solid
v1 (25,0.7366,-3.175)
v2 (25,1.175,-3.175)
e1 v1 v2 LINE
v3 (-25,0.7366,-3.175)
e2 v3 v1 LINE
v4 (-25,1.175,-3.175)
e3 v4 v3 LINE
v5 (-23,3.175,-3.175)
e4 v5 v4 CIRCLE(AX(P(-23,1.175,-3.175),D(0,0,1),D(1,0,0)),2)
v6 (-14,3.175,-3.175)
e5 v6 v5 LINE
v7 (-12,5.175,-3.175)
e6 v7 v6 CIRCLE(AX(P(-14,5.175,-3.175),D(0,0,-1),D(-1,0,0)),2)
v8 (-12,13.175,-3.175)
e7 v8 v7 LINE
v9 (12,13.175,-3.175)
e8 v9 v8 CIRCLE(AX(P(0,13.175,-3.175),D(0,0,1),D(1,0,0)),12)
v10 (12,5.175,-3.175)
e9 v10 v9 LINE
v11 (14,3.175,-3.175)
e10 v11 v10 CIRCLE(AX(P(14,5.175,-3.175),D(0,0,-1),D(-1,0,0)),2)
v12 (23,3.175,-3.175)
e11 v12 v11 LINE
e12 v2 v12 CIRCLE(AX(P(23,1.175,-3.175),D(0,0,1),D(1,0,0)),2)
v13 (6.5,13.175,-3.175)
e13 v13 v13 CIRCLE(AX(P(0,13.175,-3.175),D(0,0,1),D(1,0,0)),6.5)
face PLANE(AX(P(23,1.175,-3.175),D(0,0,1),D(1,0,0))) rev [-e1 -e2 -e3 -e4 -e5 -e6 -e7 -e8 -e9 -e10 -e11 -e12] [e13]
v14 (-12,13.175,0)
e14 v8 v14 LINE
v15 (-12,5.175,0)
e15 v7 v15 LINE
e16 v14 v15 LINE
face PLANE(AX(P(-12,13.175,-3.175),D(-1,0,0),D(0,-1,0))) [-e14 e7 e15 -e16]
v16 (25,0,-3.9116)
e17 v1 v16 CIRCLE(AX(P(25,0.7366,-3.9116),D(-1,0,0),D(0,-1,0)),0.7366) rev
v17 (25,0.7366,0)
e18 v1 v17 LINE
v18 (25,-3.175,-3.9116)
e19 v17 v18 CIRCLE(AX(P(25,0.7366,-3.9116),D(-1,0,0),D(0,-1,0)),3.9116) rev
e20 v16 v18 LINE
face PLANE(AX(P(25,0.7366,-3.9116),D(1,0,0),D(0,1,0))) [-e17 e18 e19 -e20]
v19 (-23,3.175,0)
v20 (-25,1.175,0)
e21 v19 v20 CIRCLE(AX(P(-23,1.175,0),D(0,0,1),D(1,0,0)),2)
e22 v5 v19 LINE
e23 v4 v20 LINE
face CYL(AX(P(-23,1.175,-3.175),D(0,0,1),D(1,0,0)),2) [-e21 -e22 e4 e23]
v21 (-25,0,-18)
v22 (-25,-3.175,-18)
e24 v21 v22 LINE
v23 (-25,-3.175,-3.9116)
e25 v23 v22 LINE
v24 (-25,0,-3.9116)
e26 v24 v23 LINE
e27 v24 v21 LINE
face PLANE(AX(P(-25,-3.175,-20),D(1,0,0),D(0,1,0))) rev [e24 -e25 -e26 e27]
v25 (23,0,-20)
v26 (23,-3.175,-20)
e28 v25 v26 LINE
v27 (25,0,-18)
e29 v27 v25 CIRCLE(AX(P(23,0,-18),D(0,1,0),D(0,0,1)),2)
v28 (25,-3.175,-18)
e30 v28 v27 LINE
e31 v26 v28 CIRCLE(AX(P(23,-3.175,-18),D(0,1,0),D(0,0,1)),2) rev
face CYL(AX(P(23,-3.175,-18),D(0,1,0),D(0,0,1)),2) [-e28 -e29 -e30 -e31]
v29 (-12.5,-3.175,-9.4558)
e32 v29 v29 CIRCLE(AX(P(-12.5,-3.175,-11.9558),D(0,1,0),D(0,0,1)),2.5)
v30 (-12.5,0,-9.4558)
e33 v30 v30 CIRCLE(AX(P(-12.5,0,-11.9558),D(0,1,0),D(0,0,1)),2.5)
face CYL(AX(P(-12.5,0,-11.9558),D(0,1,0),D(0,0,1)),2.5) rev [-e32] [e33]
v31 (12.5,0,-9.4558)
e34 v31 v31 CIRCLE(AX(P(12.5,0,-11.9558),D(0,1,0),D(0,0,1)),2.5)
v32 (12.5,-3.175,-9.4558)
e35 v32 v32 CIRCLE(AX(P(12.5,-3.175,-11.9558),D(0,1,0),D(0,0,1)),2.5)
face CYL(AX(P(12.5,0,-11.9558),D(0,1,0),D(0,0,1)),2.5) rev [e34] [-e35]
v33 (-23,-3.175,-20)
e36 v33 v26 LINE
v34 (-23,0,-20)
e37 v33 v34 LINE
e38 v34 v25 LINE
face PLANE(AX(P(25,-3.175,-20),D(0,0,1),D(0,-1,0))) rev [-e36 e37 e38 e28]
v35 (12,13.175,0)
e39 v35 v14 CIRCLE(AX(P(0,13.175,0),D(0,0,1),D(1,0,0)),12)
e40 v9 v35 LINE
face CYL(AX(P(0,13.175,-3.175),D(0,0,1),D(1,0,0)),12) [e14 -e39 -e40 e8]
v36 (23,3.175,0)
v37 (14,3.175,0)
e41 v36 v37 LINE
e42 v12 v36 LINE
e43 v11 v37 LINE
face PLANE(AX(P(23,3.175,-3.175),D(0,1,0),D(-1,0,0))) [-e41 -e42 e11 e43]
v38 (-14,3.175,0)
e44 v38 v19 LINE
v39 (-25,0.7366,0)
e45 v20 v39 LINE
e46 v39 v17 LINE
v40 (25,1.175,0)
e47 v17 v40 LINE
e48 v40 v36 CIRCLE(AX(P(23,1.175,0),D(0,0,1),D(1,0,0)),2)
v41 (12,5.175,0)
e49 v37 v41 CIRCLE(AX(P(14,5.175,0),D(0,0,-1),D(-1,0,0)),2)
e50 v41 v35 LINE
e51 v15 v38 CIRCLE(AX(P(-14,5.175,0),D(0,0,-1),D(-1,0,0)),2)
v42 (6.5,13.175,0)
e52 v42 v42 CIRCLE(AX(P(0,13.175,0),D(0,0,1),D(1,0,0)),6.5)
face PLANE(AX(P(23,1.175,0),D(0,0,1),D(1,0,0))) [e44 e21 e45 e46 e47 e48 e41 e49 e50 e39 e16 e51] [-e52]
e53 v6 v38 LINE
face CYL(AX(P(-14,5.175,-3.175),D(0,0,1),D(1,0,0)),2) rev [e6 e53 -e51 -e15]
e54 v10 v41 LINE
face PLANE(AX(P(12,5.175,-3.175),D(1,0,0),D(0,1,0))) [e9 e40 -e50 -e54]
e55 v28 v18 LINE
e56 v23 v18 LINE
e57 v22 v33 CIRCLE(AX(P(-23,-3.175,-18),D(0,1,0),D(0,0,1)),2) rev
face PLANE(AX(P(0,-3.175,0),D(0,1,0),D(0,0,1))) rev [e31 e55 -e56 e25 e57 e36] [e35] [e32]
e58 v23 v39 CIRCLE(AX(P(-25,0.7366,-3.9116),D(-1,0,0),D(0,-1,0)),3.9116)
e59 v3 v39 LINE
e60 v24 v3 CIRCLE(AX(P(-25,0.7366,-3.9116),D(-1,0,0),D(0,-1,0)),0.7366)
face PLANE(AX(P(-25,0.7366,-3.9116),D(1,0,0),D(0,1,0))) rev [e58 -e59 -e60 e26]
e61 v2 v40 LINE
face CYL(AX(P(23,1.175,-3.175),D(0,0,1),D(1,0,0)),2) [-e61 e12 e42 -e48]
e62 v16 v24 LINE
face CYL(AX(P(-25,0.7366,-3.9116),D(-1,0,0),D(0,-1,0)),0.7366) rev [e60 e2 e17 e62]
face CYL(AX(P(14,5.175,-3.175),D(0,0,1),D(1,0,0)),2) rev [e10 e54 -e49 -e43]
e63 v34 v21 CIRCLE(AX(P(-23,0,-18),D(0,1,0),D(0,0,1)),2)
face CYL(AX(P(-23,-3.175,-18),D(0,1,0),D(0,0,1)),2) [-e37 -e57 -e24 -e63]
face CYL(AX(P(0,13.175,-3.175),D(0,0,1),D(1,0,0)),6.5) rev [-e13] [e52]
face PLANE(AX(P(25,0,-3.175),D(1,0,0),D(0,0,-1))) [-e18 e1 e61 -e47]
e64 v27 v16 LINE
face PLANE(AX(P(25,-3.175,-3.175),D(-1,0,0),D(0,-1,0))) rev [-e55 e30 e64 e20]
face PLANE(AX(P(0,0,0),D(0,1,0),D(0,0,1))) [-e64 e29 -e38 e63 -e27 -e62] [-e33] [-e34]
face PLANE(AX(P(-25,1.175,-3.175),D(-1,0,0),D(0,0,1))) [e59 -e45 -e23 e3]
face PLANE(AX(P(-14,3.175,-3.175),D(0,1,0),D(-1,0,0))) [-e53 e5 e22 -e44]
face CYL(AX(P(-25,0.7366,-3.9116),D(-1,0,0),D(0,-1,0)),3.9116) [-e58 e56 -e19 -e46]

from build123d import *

# Parameters (mm, degrees)
SKETCH1_R                    = 6.5
BASE_FLANGE1_DEPTH           = 3.175
EDGE_FLANGE1_STRIP_W         = 14.1732
EDGE_FLANGE1_STRIP_H         = 3.175
EDGE_FLANGE1_STRIP_CUT_DEPTH = 50
EDGE_FLANGE1_DEPTH           = 50
FILLET2_R                    = 2
F_5_0MM_DOWEL_HOLE1_D        = 5


# Sheet-metal steps are written as plain solids
with BuildPart() as part:
    # Sketch1 → Base-Flange1 (new body)
    with BuildSketch(Plane.XY):
        with BuildLine():
            Line((-25, 0), (25, 0))
            Line((25, 0), (25, 1.175))
            ThreePointArc((25, 1.175), (24.414213562, 2.589213562), (23, 3.175))
            Line((23, 3.175), (14, 3.175))
            ThreePointArc((14, 3.175), (12.585786438, 3.760786438), (12, 5.175))
            Line((12, 5.175), (12, 13.175))
            ThreePointArc((12, 13.175), (0, 25.175), (-12, 13.175))
            Line((-12, 13.175), (-12, 5.175))
            ThreePointArc((-12, 5.175), (-12.585786438, 3.760786438), (-14, 3.175))
            Line((-14, 3.175), (-23, 3.175))
            ThreePointArc((-23, 3.175), (-24.414213562, 2.589213562), (-25, 1.175))
            Line((-25, 1.175), (-25, 0))
        make_face()
        with Locations((0, 13.175)):
            Circle(SKETCH1_R, mode=Mode.SUBTRACT)
    extrude(amount=-BASE_FLANGE1_DEPTH)

    # Edge-Flange1 strip (across the edge) → Edge-Flange1 strip cut (cut)
    with BuildSketch(Plane(origin=(25, 0, -3.175), x_dir=(0, 1, 0), z_dir=(-1, 0, 0))):
        with Locations((-6.35, -1.5875)):
            Rectangle(EDGE_FLANGE1_STRIP_W, EDGE_FLANGE1_STRIP_H)
    extrude(amount=EDGE_FLANGE1_STRIP_CUT_DEPTH, mode=Mode.SUBTRACT)

    # Edge-Flange1 section (across the edge) → Edge-Flange1 (add)
    with BuildSketch(Plane(origin=(25, 0, -3.175), x_dir=(0, 1, 0), z_dir=(-1, 0, 0))):
        with BuildLine():
            Line((-3.175, 0.7366), (-3.175, 16.825))
            Line((-3.175, 16.825), (0, 16.825))
            Line((0, 16.825), (0, 0.7366))
            ThreePointArc((0, 0.7366), (0.215745145, 0.215745145), (0.7366, 0))
            Line((0.7366, 0), (0.7366, -3.175))
            ThreePointArc((0.7366, -3.175), (-2.029318885, -2.029318885), (-3.175, 0.7366))
        make_face()
    extrude(amount=EDGE_FLANGE1_DEPTH)

    # Fillet2
    fillet2_edges = [part.edges().sort_by_distance(p)[0] for p in [
        (25, -1.5875, -20),
        (-25, -1.5875, -20),
    ]]
    fillet(fillet2_edges, radius=FILLET2_R)

    # Ø5.0mm Dowel Hole1 (through all)
    with Locations(Plane(origin=(0, 0, 0), x_dir=(1, 0, 0), z_dir=(0, 1, 0))):
        with Locations((-12.5, 11.9558), (12.5, 11.9558)):
            Hole(F_5_0MM_DOWEL_HOLE1_D / 2)


solid = part.part
